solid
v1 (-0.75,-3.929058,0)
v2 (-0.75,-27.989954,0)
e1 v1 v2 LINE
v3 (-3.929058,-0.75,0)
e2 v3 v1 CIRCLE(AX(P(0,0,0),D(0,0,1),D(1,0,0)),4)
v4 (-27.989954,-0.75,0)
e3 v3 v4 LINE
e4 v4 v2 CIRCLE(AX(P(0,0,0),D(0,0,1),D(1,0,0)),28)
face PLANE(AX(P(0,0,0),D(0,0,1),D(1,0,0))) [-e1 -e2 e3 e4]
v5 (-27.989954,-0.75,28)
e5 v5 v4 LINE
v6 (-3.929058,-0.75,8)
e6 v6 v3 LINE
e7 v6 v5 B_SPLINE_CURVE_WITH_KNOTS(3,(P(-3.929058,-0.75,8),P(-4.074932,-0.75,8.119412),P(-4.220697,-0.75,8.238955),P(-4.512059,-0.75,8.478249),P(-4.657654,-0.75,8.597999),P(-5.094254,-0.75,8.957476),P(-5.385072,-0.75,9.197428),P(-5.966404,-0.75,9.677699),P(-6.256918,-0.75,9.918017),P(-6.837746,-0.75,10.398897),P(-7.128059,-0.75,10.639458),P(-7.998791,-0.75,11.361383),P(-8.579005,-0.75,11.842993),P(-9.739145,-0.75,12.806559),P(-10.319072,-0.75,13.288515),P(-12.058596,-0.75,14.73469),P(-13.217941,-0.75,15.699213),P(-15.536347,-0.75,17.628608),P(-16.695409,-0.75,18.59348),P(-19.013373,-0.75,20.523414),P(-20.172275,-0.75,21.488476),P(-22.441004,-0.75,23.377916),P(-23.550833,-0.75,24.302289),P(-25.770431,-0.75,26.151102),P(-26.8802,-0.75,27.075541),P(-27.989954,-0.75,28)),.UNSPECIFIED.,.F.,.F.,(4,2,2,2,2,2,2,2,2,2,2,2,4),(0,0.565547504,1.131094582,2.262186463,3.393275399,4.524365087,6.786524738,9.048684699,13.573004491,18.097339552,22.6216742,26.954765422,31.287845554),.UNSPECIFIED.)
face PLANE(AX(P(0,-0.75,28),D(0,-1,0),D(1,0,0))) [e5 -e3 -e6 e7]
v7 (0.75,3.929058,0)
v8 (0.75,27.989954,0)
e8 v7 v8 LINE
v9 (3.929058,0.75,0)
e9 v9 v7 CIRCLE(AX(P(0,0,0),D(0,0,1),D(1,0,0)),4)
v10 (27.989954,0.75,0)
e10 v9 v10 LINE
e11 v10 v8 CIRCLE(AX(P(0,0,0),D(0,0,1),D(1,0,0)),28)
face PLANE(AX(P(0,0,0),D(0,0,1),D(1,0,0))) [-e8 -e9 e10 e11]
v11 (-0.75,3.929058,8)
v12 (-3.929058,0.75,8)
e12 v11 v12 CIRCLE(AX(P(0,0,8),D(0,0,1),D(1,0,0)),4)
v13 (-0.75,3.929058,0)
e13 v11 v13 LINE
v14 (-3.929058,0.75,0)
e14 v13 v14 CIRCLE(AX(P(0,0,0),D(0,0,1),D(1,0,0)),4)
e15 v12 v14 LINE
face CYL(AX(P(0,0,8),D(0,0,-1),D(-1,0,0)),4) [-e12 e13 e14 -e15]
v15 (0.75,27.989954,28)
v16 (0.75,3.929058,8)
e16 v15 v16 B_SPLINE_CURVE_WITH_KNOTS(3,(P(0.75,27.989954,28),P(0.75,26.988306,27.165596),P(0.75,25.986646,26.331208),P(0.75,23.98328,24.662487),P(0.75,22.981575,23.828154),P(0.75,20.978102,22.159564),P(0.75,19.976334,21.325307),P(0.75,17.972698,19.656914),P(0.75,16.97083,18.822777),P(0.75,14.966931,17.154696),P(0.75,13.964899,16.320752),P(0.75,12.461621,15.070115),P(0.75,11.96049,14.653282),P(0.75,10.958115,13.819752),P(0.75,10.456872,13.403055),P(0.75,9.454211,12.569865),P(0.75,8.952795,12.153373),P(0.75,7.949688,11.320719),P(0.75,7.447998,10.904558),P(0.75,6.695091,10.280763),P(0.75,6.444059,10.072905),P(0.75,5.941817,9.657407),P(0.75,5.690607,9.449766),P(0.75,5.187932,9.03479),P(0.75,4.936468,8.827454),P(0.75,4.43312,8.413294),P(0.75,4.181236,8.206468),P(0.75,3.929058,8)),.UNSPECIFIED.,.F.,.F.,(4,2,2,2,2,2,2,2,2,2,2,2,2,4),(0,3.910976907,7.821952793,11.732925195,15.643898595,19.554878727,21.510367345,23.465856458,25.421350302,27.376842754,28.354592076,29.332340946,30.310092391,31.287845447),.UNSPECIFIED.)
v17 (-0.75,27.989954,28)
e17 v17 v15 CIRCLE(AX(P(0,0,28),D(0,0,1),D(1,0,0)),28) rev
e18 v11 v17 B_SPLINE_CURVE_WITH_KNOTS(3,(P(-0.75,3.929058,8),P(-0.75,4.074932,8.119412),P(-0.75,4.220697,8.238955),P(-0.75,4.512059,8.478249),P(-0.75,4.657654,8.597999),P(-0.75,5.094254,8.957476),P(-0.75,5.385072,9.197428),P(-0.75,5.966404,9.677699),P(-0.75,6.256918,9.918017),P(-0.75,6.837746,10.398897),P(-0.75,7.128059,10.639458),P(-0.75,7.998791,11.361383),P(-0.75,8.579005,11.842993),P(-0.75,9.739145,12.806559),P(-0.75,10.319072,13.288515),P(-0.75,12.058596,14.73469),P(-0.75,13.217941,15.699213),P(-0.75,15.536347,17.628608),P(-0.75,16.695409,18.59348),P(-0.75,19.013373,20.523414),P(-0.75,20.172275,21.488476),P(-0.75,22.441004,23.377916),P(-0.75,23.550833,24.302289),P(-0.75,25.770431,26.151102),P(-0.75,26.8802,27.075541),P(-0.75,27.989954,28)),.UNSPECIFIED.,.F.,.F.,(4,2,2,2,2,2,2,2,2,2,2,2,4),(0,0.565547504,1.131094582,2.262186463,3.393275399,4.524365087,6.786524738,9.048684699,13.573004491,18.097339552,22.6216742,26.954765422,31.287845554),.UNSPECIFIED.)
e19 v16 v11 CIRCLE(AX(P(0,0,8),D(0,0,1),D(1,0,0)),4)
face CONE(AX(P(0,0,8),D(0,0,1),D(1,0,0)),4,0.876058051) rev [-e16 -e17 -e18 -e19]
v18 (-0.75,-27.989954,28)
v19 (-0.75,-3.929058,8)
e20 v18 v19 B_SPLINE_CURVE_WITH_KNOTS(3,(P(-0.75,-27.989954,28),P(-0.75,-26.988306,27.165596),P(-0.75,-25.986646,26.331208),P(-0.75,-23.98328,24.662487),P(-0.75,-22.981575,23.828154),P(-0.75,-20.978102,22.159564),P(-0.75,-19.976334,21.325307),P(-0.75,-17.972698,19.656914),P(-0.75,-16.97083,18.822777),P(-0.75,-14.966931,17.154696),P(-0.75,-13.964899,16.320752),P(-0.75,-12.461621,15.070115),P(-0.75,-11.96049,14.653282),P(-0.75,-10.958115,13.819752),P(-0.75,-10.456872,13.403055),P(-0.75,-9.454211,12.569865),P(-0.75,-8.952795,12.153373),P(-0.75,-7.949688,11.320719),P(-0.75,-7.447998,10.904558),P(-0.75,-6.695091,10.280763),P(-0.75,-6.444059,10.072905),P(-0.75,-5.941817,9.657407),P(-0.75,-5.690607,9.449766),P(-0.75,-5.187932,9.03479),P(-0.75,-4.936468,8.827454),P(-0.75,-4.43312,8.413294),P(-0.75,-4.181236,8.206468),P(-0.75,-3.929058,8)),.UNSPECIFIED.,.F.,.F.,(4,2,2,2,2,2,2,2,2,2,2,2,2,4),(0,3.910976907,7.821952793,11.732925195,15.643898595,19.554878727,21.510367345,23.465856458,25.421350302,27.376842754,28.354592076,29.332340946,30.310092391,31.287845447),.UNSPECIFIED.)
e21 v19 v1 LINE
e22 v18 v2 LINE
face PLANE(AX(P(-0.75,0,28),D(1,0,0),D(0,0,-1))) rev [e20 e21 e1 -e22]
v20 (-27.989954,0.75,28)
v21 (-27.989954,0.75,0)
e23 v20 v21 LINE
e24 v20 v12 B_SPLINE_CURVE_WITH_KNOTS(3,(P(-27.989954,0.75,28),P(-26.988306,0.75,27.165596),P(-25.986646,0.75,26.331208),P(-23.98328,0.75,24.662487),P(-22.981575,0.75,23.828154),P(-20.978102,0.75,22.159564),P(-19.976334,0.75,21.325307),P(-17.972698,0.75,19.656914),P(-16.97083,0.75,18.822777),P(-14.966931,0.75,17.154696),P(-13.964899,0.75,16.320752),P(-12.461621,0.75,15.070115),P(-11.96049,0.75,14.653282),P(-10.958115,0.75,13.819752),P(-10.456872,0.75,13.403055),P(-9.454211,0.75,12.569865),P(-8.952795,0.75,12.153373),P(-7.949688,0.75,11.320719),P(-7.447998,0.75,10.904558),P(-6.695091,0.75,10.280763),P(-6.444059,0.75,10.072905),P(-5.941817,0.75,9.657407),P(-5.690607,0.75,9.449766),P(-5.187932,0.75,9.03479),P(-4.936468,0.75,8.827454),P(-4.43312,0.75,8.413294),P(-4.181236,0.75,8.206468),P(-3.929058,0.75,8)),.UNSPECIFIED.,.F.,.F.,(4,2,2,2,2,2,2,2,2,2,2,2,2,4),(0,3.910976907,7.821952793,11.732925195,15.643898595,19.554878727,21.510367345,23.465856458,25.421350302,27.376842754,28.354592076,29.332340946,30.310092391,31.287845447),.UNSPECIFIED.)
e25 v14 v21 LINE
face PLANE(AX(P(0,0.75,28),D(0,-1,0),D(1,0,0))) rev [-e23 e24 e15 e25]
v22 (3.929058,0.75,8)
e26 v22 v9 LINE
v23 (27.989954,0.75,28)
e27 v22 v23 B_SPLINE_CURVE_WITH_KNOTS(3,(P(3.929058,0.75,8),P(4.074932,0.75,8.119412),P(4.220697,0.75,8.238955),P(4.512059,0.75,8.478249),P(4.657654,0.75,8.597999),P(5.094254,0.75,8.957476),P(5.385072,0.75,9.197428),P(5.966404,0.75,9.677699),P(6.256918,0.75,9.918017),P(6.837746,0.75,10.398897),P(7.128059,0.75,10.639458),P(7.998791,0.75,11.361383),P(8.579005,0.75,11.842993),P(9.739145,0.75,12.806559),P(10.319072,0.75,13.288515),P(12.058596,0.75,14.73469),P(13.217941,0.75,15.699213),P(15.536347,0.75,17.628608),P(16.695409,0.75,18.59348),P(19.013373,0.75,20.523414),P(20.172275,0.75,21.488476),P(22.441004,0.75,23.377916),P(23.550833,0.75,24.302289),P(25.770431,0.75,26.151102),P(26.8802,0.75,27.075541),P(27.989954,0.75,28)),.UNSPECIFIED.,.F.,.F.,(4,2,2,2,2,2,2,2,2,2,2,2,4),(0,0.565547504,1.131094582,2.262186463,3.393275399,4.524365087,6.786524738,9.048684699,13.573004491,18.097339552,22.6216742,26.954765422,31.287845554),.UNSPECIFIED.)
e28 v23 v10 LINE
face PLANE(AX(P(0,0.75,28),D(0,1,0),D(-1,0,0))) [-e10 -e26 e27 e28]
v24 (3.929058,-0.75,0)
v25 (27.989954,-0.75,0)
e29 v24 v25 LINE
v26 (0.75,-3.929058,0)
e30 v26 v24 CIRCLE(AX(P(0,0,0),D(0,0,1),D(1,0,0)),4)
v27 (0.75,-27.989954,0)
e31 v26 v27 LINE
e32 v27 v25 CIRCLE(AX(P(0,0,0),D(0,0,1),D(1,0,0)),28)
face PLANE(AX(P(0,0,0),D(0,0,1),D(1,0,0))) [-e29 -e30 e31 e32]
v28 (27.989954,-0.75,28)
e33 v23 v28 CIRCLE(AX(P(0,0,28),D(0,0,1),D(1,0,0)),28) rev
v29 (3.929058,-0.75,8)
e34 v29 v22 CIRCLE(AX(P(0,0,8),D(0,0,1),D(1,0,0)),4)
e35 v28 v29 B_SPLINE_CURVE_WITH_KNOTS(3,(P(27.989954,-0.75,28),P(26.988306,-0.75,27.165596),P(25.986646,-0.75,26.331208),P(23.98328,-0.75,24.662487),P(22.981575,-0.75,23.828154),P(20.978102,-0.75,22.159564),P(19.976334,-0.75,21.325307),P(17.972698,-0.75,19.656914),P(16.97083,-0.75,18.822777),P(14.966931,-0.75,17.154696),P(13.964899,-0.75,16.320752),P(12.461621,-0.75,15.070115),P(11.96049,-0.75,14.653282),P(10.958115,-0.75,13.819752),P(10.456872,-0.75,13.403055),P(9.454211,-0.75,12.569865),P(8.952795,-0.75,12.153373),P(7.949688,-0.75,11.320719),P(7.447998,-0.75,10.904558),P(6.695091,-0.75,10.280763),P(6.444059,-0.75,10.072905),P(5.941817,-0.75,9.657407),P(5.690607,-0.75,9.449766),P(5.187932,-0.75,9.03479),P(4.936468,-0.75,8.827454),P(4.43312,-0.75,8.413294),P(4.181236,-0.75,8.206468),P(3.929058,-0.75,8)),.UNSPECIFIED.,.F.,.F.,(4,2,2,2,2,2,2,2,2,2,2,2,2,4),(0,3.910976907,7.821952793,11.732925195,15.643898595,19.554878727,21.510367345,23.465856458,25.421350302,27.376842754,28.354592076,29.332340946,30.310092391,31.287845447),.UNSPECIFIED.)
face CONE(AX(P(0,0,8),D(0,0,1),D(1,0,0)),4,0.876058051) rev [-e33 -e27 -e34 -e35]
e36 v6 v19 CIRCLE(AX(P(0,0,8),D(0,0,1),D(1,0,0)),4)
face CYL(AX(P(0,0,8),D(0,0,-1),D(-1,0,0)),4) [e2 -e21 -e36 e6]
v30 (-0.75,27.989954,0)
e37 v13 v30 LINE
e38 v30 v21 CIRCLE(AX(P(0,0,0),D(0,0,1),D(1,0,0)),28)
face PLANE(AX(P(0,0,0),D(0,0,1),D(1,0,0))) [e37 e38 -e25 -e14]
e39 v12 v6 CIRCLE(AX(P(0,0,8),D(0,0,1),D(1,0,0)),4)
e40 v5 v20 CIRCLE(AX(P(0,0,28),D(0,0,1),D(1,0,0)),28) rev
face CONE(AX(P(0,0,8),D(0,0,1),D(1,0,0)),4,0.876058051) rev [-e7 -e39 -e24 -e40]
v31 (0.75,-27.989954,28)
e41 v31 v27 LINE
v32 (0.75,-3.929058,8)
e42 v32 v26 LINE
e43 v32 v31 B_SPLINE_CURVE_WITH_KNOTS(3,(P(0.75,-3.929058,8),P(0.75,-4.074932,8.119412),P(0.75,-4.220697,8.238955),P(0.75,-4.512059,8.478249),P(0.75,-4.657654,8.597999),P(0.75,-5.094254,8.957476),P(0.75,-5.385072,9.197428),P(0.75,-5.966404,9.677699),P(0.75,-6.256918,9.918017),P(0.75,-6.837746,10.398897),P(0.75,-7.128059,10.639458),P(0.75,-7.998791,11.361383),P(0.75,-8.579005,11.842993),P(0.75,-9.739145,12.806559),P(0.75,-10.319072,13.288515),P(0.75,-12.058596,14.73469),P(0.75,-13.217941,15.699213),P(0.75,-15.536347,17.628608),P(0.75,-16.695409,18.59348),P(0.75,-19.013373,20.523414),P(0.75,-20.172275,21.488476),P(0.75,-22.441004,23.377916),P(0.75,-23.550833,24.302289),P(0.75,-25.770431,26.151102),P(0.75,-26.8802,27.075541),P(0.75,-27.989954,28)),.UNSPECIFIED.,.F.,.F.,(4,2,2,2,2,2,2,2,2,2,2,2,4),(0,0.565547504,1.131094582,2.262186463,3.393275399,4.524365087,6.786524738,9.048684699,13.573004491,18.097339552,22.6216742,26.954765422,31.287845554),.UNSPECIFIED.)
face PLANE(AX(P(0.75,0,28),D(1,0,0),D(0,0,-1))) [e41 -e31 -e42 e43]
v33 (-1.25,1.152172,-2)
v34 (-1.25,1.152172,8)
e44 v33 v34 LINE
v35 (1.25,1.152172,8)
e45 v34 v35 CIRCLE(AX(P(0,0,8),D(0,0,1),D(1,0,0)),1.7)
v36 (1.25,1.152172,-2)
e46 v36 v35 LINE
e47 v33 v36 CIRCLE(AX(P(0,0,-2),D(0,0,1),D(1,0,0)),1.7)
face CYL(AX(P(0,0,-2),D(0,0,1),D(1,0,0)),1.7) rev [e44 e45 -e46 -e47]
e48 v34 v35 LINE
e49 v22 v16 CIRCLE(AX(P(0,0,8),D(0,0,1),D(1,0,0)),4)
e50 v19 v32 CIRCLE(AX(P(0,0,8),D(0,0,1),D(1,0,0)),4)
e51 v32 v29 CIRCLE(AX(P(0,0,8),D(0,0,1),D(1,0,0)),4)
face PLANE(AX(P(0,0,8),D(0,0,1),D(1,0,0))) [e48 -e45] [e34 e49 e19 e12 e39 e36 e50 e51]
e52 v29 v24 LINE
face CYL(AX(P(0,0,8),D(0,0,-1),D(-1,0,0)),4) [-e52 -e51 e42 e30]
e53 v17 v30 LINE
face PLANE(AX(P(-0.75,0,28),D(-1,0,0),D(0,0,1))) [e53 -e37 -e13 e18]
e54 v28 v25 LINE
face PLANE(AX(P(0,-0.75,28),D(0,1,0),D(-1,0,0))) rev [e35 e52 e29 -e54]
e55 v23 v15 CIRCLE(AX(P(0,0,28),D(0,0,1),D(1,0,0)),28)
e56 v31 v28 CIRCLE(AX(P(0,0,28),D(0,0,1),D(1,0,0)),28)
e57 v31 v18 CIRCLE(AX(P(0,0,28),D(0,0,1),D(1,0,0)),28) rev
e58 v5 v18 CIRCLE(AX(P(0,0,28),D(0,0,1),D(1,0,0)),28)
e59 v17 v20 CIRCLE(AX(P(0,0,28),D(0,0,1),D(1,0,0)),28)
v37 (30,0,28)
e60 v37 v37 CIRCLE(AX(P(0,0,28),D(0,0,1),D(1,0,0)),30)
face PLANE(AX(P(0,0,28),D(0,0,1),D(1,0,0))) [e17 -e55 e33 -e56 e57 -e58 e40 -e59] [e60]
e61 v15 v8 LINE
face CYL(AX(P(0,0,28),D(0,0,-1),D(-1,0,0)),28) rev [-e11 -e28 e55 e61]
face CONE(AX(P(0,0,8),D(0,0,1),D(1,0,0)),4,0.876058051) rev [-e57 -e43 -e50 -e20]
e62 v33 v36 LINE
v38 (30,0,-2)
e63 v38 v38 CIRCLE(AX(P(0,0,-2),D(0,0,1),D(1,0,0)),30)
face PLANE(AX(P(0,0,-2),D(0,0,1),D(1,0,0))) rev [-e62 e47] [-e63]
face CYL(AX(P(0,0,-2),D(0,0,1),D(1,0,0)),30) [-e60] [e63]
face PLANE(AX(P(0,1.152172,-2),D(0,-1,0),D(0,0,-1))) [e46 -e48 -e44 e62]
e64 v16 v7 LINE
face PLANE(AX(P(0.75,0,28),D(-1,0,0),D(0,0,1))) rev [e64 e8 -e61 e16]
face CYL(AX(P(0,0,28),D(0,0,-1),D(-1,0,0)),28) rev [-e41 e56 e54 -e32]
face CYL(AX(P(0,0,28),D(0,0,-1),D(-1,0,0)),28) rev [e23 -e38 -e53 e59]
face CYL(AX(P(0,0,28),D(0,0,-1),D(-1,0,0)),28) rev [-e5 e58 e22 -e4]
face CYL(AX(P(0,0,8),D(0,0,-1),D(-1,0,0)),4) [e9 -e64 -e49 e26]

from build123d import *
from OCP.BRepFilletAPI import BRepFilletAPI_MakeChamfer

# Parameters (mm, degrees)
SKETCH1_R                      = 30
SKETCH1_R_2                    = 28
SKETCH1_R_3                    = 4
BOSS_EXTRUDE1_DEPTH            = 2
BOSS_EXTRUDE2_START            = 8
SKETCH1_3_R                    = 4
BOSS_EXTRUDE2_DEPTH            = 8
BOSS_EXTRUDE3_START            = 28
SKETCH1_4_R                    = 30
BOSS_EXTRUDE3_DEPTH            = 28
CHAMFER1_SIZE2                 = 20
CHAMFER1_SIZE                  = 24
CIRPATTERN1_COUNT              = 4
CHAMFER1_OF_CIRPATTERN1_SIZE   = 24
CHAMFER1_OF_CIRPATTERN1_SIZE_2 = 20


with BuildPart() as part:
    # Sketch1 → Boss-Extrude1 (new body)
    # profile 1 of 6: a face of its own
    with BuildSketch(Plane.XY):
        Circle(SKETCH1_R)
        Circle(SKETCH1_R_2, mode=Mode.SUBTRACT)
    # profile 2 of 6: a face of its own
    with BuildSketch(Plane.XY):
        with BuildLine():
            Line((-0.75, 27.989953555), (-0.75, 3.929058411))
            ThreePointArc((-0.75, 3.929058411), (0, 4), (0.75, 3.929058411))
            Line((0.75, 3.929058411), (0.75, 27.989953555))
            ThreePointArc((0.75, 27.989953555), (0, 28), (-0.75, 27.989953555))
        make_face()
    # profile 3 of 6: a face of its own
    with BuildSketch(Plane.XY):
        with BuildLine():
            ThreePointArc((4, 0), (-2.549509757, -3.082207001), (-0.75, 3.929058411))
            Line((-0.75, 3.929058411), (-0.75, 27.989953555))
            ThreePointArc((-0.75, 27.989953555), (-19.532024985, -20.062402648), (28, 0))
            ThreePointArc((28, 0), (20.062402648, 19.532024985), (0.75, 27.989953555))
            Line((0.75, 27.989953555), (0.75, 3.929058411))
            ThreePointArc((0.75, 3.929058411), (3.082207001, 2.549509757), (4, 0))
        make_face()
    # profile 4 of 6: a face of its own
    with BuildSketch(Plane.XY):
        with BuildLine():
            ThreePointArc((4, 0), (-2.549509757, -3.082207001), (-0.75, 3.929058411))
            Line((-0.75, 3.929058411), (-0.75, 27.989953555))
            ThreePointArc((-0.75, 27.989953555), (-19.532024985, -20.062402648), (28, 0))
            ThreePointArc((28, 0), (20.062402648, 19.532024985), (0.75, 27.989953555))
            Line((0.75, 27.989953555), (0.75, 3.929058411))
            ThreePointArc((0.75, 3.929058411), (3.082207001, 2.549509757), (4, 0))
        make_face()
    # profile 5 of 6: a face of its own
    with BuildSketch(Plane.XY):
        with BuildLine():
            Line((-0.75, 27.989953555), (-0.75, 3.929058411))
            ThreePointArc((-0.75, 3.929058411), (0, 4), (0.75, 3.929058411))
            Line((0.75, 3.929058411), (0.75, 27.989953555))
            ThreePointArc((0.75, 27.989953555), (0, 28), (-0.75, 27.989953555))
        make_face()
    # profile 6 of 6: a face of its own
    with BuildSketch(Plane.XY):
        Circle(SKETCH1_R_3)
        with BuildLine():
            ThreePointArc((-1.25, 1.152171862), (0, -1.7), (1.25, 1.152171862))
            Line((1.25, 1.152171862), (-1.25, 1.152171862))
        make_face(mode=Mode.SUBTRACT)
    extrude(amount=-BOSS_EXTRUDE1_DEPTH)

    # Sketch1<3> → Boss-Extrude2 (add)
    with BuildSketch(Plane.XY.offset(BOSS_EXTRUDE2_START)):
        Circle(SKETCH1_3_R)
        with BuildLine():
            ThreePointArc((-1.25, 1.152171862), (0, -1.7), (1.25, 1.152171862))
            Line((1.25, 1.152171862), (-1.25, 1.152171862))
        make_face(mode=Mode.SUBTRACT)
    extrude(amount=-BOSS_EXTRUDE2_DEPTH)

    # Sketch1<4> → Boss-Extrude3 (add)
    with BuildSketch(Plane.XY.offset(BOSS_EXTRUDE3_START)):
        Circle(SKETCH1_4_R)
        with BuildLine():
            Line((-0.75, 27.989953555), (-0.75, 3.929058411))
            ThreePointArc((-0.75, 3.929058411), (0, 4), (0.75, 3.929058411))
            Line((0.75, 3.929058411), (0.75, 27.989953555))
            ThreePointArc((0.75, 27.989953555), (0, -28), (-0.75, 27.989953555))
        make_face(mode=Mode.SUBTRACT)
    boss_extrude3 = extrude(amount=-BOSS_EXTRUDE3_DEPTH)

    # Chamfer1
    chamfer1_edges = [part.edges().sort_by_distance(p)[0] for p in [
        (0, 4, 28),
    ]]
    chamfer1_side = [part.faces().sort_by_distance(p)[0] for p in [
        (0, 4.4, 28),
    ]]
    chamfer(chamfer1_edges, length=CHAMFER1_SIZE - 0.0001, length2=CHAMFER1_SIZE2 - 0.0001, reference=chamfer1_side[0])  # a hair under: the kernel refuses the full size

    # CirPattern1: Boss-Extrude3 ×4 about axis
    cirpattern1_axis = Axis((0, 0, 0), (0, 0, 1))
    for i in range(1, CIRPATTERN1_COUNT):
        add(boss_extrude3.rotate(cirpattern1_axis, i * 360 / CIRPATTERN1_COUNT))

    # Chamfer1 of CirPattern1
    chamfer1_of_cirpattern1_edges_1 = [part.edges().sort_by_distance(p)[0] for p in [
        (-4, 0, 28),
    ]]
    chamfer1_of_cirpattern1_side_1 = [part.faces().sort_by_distance(p)[0] for p in [
        (-4.4, 0, 28),
    ]]
    chamfer1_of_cirpattern1_edges_2 = [part.edges().sort_by_distance(p)[0] for p in [
        (0, -4, 28),
    ]]
    chamfer1_of_cirpattern1_side_2 = [part.faces().sort_by_distance(p)[0] for p in [
        (0, -4.4, 28),
    ]]
    chamfer1_of_cirpattern1_edges_3 = [part.edges().sort_by_distance(p)[0] for p in [
        (4, 0, 28),
    ]]
    chamfer1_of_cirpattern1_side_3 = [part.faces().sort_by_distance(p)[0] for p in [
        (4.4, 0, 28),
    ]]
    chamfer1_of_cirpattern1 = BRepFilletAPI_MakeChamfer(part.part.solid().wrapped)
    for e in chamfer1_of_cirpattern1_edges_1:
        chamfer1_of_cirpattern1.Add(CHAMFER1_OF_CIRPATTERN1_SIZE - 0.0001, CHAMFER1_OF_CIRPATTERN1_SIZE_2 - 0.0001, e.wrapped, chamfer1_of_cirpattern1_side_1[0].wrapped)
    for e in chamfer1_of_cirpattern1_edges_2:
        chamfer1_of_cirpattern1.Add(CHAMFER1_OF_CIRPATTERN1_SIZE - 0.0001, CHAMFER1_OF_CIRPATTERN1_SIZE_2 - 0.0001, e.wrapped, chamfer1_of_cirpattern1_side_2[0].wrapped)
    for e in chamfer1_of_cirpattern1_edges_3:
        chamfer1_of_cirpattern1.Add(CHAMFER1_OF_CIRPATTERN1_SIZE - 0.0001, CHAMFER1_OF_CIRPATTERN1_SIZE_2 - 0.0001, e.wrapped, chamfer1_of_cirpattern1_side_3[0].wrapped)
    add(Compound.cast(chamfer1_of_cirpattern1.Shape()), mode=Mode.REPLACE)  # a hair under: the kernel refuses the full size


solid = part.part
